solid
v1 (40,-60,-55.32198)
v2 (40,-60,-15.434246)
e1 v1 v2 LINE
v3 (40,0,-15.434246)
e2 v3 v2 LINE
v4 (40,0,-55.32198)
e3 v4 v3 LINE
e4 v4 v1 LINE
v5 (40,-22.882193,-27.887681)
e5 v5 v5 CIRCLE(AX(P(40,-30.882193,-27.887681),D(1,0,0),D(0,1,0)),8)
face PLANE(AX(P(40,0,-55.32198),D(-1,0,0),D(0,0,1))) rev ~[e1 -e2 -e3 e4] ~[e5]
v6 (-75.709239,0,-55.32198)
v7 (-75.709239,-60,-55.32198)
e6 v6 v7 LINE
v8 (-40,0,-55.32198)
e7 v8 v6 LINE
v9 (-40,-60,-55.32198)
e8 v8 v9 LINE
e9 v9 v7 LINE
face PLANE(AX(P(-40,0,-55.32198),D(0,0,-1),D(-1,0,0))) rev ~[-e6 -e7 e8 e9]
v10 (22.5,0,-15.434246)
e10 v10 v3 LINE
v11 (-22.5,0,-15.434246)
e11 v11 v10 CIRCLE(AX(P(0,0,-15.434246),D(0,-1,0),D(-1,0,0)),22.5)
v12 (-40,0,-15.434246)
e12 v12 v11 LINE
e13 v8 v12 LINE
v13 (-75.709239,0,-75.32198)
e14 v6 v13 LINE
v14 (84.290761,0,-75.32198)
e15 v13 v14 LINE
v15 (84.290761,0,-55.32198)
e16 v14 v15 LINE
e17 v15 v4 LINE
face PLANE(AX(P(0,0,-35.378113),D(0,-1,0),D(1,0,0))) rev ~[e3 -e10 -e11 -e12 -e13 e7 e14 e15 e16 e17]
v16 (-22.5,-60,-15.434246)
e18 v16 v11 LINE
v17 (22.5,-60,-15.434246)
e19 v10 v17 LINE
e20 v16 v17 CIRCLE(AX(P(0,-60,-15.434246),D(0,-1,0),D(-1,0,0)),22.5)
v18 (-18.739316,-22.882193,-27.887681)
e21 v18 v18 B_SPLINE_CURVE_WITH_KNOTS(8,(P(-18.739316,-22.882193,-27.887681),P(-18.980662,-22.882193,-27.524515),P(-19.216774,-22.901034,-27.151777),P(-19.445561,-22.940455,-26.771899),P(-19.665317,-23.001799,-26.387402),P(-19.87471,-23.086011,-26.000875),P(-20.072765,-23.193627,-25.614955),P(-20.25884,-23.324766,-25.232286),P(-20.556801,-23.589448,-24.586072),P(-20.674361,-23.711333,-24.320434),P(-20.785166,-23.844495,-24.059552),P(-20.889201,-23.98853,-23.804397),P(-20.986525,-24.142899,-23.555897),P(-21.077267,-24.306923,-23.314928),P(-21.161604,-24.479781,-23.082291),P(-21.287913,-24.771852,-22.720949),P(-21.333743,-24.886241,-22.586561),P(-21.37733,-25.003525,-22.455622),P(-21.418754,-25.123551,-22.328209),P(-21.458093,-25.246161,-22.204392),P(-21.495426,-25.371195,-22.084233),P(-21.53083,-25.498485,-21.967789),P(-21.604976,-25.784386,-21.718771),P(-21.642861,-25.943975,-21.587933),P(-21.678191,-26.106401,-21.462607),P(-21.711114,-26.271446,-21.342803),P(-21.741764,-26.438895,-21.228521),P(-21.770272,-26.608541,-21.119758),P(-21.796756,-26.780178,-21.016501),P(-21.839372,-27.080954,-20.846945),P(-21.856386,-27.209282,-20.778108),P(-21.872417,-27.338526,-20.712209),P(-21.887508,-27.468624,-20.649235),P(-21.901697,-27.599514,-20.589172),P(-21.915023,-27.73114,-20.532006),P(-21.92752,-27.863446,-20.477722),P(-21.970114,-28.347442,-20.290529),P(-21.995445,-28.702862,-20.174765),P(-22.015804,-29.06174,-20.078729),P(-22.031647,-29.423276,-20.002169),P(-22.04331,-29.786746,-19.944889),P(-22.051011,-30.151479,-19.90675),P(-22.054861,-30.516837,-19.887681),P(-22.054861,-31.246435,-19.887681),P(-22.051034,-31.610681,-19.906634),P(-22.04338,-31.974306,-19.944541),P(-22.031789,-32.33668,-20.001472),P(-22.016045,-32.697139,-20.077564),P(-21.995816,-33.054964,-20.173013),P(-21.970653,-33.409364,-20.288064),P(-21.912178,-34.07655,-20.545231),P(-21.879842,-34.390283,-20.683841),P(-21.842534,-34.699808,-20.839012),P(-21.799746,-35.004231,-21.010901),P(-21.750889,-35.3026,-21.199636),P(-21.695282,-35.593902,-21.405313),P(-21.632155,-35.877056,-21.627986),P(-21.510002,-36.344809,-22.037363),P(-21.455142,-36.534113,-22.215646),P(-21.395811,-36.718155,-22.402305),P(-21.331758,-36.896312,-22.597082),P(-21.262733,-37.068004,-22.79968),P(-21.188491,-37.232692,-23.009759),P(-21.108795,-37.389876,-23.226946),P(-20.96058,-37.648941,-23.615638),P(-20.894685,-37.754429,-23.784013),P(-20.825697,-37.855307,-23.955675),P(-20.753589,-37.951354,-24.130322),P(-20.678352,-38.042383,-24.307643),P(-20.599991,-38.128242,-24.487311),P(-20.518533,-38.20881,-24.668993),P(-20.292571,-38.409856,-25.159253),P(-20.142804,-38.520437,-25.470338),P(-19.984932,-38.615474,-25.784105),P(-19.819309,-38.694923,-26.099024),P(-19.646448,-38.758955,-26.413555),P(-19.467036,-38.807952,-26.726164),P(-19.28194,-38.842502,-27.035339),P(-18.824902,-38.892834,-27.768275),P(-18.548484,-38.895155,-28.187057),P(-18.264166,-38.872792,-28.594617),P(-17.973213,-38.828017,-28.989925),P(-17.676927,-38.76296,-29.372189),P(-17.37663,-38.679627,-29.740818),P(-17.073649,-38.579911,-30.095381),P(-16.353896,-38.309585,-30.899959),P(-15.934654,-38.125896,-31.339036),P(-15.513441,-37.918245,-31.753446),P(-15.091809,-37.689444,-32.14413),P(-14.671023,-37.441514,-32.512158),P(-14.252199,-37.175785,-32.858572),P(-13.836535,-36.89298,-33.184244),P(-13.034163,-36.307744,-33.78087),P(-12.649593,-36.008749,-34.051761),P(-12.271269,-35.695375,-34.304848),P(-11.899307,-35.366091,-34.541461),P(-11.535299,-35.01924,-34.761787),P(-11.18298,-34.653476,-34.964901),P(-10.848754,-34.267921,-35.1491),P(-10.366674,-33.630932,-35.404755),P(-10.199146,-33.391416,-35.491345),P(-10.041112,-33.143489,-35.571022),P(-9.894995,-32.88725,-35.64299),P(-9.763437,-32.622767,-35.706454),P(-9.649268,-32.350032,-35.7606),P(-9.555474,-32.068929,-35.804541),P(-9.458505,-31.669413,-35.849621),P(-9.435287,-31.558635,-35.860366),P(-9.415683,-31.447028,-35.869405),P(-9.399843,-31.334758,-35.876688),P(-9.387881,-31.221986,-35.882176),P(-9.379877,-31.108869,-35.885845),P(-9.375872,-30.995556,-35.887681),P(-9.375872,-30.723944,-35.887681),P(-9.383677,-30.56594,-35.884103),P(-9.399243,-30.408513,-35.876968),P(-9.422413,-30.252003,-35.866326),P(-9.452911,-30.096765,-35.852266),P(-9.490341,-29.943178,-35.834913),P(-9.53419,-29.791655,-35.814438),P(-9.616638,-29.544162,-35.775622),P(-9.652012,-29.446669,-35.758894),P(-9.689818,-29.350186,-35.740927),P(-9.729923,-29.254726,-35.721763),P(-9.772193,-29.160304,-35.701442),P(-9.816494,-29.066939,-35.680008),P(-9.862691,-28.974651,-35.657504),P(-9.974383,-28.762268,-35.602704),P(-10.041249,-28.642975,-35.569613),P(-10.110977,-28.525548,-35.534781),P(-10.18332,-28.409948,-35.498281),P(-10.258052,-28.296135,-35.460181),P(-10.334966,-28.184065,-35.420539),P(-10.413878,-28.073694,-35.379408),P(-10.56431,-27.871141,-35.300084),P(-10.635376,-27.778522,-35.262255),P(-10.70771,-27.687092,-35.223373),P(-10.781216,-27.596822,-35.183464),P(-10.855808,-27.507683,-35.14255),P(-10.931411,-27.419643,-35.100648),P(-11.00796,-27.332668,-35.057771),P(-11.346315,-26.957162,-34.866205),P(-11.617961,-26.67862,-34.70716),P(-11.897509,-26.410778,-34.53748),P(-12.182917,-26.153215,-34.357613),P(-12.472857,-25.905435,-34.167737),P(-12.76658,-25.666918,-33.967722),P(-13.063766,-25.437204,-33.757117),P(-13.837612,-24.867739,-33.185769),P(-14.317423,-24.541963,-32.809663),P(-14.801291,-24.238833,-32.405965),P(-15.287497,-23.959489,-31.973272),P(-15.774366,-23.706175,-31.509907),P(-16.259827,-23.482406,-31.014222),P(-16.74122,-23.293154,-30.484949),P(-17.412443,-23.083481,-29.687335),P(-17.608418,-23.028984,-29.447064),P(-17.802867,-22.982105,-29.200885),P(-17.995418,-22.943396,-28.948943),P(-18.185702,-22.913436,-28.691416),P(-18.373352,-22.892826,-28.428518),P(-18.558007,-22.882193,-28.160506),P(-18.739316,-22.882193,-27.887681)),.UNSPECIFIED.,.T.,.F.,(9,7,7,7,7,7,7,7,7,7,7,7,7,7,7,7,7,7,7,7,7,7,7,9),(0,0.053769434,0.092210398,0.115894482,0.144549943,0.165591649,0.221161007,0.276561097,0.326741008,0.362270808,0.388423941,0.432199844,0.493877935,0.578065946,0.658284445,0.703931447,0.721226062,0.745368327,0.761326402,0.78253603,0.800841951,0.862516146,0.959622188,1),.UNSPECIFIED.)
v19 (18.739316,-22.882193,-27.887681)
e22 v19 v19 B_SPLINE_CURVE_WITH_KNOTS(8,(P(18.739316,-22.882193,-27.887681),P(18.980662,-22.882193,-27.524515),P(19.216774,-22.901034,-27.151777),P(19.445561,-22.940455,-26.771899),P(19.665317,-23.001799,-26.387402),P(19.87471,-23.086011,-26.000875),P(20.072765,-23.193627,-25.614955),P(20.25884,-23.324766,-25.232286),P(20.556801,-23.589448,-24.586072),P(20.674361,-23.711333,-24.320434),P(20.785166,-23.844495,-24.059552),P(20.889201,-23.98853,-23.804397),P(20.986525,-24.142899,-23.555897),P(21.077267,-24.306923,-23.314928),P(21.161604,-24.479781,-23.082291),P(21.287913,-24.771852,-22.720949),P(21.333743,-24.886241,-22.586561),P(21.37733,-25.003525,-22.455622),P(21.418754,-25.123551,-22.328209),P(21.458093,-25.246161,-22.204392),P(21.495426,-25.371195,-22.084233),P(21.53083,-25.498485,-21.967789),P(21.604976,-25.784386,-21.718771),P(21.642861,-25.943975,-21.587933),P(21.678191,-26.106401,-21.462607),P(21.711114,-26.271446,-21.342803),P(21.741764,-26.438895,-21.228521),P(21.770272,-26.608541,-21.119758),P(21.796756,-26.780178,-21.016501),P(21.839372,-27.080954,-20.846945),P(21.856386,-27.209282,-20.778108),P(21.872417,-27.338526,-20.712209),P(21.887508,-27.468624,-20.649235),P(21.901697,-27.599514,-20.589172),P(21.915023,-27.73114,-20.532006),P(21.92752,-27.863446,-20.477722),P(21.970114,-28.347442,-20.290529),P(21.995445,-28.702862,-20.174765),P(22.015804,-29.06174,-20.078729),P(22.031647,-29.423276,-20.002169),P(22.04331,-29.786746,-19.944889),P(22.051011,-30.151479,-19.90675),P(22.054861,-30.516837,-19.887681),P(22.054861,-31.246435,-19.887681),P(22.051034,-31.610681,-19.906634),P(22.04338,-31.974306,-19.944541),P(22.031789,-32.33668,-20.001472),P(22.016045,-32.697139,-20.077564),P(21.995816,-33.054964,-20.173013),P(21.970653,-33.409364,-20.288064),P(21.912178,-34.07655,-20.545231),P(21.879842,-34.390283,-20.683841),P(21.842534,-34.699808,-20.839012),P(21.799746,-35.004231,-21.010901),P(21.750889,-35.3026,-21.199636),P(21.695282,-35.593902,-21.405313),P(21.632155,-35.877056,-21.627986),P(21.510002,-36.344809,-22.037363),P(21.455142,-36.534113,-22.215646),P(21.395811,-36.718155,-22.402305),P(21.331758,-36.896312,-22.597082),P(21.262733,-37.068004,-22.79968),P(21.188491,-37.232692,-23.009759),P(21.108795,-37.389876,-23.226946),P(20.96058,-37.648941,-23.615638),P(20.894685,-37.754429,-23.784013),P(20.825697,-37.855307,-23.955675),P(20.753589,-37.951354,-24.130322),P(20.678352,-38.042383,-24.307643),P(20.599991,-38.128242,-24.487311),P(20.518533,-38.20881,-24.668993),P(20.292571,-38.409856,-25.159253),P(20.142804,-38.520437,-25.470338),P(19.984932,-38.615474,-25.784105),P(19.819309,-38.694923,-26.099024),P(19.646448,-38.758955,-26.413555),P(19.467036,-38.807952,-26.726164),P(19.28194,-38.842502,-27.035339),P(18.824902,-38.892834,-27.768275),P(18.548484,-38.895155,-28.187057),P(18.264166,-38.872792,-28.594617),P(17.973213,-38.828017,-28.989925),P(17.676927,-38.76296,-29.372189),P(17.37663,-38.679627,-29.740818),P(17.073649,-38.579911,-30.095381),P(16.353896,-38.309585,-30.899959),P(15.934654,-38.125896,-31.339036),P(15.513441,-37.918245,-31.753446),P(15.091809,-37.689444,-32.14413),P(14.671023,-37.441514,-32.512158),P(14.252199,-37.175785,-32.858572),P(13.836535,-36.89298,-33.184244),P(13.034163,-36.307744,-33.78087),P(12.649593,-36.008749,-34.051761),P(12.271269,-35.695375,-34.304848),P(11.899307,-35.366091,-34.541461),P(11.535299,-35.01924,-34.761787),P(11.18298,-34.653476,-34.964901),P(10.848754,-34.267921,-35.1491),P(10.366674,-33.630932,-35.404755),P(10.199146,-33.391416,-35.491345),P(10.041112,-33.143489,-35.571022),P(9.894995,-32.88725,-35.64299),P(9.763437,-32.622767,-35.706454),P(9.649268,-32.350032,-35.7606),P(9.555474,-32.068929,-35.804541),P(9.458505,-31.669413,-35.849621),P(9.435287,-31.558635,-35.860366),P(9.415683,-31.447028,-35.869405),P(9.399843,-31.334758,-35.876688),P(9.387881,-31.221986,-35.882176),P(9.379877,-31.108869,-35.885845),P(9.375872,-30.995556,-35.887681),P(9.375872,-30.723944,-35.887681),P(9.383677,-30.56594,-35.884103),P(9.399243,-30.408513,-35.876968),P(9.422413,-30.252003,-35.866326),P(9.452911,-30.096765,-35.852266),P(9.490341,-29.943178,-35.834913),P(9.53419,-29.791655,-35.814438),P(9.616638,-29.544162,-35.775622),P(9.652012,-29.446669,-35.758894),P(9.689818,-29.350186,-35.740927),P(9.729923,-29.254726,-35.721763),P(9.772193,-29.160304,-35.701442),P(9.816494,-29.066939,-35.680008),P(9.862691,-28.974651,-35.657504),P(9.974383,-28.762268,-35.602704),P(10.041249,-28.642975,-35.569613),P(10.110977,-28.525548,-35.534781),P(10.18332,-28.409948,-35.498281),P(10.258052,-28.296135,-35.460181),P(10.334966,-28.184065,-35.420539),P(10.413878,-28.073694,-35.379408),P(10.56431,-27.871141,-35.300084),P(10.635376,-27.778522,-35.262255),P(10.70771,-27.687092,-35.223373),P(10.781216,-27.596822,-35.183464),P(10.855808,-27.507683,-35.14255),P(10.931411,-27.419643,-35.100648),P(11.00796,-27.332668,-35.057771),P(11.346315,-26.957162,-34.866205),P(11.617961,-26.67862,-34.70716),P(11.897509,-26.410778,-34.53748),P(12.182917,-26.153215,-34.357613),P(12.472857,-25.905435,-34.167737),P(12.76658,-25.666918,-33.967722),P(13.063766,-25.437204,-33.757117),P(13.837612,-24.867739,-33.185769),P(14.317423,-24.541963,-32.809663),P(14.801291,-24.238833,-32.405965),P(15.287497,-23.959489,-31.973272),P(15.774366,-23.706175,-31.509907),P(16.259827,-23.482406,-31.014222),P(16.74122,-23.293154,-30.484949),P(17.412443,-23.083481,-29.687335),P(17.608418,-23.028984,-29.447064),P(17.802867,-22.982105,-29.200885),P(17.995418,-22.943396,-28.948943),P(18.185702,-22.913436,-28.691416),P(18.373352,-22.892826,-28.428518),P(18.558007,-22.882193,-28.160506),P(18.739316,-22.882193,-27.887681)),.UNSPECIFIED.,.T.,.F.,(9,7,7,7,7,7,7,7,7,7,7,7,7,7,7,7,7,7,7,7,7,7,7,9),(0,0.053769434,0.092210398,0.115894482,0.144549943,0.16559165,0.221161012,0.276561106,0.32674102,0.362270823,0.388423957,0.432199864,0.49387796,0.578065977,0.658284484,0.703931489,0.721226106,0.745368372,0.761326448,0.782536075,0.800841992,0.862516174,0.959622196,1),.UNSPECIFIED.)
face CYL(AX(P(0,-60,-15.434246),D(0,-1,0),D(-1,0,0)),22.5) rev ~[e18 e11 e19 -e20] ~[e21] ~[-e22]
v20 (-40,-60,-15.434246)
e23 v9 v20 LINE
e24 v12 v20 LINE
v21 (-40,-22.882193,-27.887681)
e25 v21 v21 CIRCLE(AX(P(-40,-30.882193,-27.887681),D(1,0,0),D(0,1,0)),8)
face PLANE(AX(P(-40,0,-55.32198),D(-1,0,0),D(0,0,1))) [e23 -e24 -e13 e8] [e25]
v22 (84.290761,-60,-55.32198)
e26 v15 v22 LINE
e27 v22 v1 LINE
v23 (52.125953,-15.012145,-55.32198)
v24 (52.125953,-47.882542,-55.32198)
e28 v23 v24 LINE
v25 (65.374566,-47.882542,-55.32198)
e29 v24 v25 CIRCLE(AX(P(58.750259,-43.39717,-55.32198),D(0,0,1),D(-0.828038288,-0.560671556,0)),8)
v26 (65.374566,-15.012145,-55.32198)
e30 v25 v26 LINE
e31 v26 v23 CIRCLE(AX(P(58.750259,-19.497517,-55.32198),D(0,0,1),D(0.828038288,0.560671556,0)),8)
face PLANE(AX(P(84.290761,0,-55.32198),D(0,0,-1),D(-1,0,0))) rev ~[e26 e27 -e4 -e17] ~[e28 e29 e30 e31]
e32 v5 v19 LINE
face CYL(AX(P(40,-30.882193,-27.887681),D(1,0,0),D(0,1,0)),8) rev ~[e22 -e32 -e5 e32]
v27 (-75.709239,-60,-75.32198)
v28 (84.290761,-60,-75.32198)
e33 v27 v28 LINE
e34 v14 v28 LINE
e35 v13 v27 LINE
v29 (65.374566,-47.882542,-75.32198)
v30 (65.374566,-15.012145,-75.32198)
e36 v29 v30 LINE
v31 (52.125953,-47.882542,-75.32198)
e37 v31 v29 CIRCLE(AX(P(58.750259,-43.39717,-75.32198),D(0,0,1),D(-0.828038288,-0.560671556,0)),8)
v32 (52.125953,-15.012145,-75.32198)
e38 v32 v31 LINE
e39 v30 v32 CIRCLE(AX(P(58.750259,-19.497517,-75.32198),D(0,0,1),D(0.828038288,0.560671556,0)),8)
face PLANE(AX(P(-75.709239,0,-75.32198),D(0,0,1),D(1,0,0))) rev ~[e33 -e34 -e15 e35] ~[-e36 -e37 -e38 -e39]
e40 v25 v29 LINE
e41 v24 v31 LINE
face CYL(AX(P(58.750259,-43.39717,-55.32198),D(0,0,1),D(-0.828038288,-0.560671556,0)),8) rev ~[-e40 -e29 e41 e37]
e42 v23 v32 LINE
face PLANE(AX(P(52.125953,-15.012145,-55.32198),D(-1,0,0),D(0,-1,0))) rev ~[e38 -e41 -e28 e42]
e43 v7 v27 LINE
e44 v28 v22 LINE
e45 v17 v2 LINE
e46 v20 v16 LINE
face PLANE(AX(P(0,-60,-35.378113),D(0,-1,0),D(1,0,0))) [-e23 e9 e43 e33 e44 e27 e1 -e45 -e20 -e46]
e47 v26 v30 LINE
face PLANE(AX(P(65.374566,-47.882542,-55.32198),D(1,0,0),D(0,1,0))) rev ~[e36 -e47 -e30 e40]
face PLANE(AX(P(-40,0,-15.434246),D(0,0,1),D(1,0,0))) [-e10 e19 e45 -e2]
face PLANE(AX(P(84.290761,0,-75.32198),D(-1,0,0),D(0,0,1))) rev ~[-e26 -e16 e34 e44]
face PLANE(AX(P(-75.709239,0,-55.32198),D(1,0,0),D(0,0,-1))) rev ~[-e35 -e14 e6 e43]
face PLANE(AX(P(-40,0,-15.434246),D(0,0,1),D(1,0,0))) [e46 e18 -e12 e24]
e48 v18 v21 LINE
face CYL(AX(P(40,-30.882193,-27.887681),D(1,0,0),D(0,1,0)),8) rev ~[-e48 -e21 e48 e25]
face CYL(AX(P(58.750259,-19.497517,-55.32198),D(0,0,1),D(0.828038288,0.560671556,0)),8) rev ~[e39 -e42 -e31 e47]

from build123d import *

# Parameters (mm, degrees)
F0_W     = 80
F0_H     = 39.8877346888
F1_DEPTH = 60
F3_DEPTH = 60.001
F5_DEPTH = 20.001
F6_R     = 8
F7_DEPTH = 115.7102386484


# Not quite as in the source:
# - a feature names something its author has since deleted; it is built from what else it names


with BuildPart() as f1:
    # F0 (on Front) → F1 (new body)
    with BuildSketch(Plane.XZ):
        with Locations((0, -35.378112942)):
            Rectangle(F0_W, F0_H)
        Polygon((-75.7092386484, -55.3219802864), (-75.7092386484, -75.3219802864), (84.2907613516, -75.3219802864), (84.2907613516, -55.3219802864), (40, -55.3219802864), (-40, -55.3219802864), align=None)
    extrude(amount=F1_DEPTH)

    # F2 (on face) → F3 (cut, through all)
    with BuildSketch(Plane.XZ.offset(60)):
        with BuildLine():
            Line((-22.5, -15.4342455976), (22.5, -15.4342455976))
            ThreePointArc((22.5, -15.4342455976), (0, 7.0657544024), (-22.5, -15.4342455976))
        make_face()
        with BuildLine():
            ThreePointArc((-22.5, -15.4342455976), (0, -37.9342455976), (22.5, -15.4342455976))
            Line((22.5, -15.4342455976), (-22.5, -15.4342455976))
        make_face()
    extrude(amount=-F3_DEPTH, mode=Mode.SUBTRACT)

    # F4 (on face) → F5 (cut, through all)
    with BuildSketch(Plane.XY.offset(-55.3219802864)):
        with BuildLine():
            Line((65.3745657473, -47.8825420141), (65.3745657473, -15.0121450424))
            ThreePointArc((65.3745657473, -15.0121450424), (58.7502594426, -11.4975174886), (52.1259531379, -15.0121450424))
            Line((52.1259531379, -15.0121450424), (52.1259531379, -47.8825420141))
            ThreePointArc((52.1259531379, -47.8825420141), (58.7502594426, -51.3971695679), (65.3745657473, -47.8825420141))
        make_face()
    extrude(amount=-F5_DEPTH, mode=Mode.SUBTRACT)

    # F6 (on face) → F7 (cut, through all)
    with BuildSketch(Plane.YZ.offset(40)):
        with Locations((-30.8821926572, -27.8876808805)):
            Circle(F6_R)
    extrude(amount=-F7_DEPTH, mode=Mode.SUBTRACT)


solid = f1.part
